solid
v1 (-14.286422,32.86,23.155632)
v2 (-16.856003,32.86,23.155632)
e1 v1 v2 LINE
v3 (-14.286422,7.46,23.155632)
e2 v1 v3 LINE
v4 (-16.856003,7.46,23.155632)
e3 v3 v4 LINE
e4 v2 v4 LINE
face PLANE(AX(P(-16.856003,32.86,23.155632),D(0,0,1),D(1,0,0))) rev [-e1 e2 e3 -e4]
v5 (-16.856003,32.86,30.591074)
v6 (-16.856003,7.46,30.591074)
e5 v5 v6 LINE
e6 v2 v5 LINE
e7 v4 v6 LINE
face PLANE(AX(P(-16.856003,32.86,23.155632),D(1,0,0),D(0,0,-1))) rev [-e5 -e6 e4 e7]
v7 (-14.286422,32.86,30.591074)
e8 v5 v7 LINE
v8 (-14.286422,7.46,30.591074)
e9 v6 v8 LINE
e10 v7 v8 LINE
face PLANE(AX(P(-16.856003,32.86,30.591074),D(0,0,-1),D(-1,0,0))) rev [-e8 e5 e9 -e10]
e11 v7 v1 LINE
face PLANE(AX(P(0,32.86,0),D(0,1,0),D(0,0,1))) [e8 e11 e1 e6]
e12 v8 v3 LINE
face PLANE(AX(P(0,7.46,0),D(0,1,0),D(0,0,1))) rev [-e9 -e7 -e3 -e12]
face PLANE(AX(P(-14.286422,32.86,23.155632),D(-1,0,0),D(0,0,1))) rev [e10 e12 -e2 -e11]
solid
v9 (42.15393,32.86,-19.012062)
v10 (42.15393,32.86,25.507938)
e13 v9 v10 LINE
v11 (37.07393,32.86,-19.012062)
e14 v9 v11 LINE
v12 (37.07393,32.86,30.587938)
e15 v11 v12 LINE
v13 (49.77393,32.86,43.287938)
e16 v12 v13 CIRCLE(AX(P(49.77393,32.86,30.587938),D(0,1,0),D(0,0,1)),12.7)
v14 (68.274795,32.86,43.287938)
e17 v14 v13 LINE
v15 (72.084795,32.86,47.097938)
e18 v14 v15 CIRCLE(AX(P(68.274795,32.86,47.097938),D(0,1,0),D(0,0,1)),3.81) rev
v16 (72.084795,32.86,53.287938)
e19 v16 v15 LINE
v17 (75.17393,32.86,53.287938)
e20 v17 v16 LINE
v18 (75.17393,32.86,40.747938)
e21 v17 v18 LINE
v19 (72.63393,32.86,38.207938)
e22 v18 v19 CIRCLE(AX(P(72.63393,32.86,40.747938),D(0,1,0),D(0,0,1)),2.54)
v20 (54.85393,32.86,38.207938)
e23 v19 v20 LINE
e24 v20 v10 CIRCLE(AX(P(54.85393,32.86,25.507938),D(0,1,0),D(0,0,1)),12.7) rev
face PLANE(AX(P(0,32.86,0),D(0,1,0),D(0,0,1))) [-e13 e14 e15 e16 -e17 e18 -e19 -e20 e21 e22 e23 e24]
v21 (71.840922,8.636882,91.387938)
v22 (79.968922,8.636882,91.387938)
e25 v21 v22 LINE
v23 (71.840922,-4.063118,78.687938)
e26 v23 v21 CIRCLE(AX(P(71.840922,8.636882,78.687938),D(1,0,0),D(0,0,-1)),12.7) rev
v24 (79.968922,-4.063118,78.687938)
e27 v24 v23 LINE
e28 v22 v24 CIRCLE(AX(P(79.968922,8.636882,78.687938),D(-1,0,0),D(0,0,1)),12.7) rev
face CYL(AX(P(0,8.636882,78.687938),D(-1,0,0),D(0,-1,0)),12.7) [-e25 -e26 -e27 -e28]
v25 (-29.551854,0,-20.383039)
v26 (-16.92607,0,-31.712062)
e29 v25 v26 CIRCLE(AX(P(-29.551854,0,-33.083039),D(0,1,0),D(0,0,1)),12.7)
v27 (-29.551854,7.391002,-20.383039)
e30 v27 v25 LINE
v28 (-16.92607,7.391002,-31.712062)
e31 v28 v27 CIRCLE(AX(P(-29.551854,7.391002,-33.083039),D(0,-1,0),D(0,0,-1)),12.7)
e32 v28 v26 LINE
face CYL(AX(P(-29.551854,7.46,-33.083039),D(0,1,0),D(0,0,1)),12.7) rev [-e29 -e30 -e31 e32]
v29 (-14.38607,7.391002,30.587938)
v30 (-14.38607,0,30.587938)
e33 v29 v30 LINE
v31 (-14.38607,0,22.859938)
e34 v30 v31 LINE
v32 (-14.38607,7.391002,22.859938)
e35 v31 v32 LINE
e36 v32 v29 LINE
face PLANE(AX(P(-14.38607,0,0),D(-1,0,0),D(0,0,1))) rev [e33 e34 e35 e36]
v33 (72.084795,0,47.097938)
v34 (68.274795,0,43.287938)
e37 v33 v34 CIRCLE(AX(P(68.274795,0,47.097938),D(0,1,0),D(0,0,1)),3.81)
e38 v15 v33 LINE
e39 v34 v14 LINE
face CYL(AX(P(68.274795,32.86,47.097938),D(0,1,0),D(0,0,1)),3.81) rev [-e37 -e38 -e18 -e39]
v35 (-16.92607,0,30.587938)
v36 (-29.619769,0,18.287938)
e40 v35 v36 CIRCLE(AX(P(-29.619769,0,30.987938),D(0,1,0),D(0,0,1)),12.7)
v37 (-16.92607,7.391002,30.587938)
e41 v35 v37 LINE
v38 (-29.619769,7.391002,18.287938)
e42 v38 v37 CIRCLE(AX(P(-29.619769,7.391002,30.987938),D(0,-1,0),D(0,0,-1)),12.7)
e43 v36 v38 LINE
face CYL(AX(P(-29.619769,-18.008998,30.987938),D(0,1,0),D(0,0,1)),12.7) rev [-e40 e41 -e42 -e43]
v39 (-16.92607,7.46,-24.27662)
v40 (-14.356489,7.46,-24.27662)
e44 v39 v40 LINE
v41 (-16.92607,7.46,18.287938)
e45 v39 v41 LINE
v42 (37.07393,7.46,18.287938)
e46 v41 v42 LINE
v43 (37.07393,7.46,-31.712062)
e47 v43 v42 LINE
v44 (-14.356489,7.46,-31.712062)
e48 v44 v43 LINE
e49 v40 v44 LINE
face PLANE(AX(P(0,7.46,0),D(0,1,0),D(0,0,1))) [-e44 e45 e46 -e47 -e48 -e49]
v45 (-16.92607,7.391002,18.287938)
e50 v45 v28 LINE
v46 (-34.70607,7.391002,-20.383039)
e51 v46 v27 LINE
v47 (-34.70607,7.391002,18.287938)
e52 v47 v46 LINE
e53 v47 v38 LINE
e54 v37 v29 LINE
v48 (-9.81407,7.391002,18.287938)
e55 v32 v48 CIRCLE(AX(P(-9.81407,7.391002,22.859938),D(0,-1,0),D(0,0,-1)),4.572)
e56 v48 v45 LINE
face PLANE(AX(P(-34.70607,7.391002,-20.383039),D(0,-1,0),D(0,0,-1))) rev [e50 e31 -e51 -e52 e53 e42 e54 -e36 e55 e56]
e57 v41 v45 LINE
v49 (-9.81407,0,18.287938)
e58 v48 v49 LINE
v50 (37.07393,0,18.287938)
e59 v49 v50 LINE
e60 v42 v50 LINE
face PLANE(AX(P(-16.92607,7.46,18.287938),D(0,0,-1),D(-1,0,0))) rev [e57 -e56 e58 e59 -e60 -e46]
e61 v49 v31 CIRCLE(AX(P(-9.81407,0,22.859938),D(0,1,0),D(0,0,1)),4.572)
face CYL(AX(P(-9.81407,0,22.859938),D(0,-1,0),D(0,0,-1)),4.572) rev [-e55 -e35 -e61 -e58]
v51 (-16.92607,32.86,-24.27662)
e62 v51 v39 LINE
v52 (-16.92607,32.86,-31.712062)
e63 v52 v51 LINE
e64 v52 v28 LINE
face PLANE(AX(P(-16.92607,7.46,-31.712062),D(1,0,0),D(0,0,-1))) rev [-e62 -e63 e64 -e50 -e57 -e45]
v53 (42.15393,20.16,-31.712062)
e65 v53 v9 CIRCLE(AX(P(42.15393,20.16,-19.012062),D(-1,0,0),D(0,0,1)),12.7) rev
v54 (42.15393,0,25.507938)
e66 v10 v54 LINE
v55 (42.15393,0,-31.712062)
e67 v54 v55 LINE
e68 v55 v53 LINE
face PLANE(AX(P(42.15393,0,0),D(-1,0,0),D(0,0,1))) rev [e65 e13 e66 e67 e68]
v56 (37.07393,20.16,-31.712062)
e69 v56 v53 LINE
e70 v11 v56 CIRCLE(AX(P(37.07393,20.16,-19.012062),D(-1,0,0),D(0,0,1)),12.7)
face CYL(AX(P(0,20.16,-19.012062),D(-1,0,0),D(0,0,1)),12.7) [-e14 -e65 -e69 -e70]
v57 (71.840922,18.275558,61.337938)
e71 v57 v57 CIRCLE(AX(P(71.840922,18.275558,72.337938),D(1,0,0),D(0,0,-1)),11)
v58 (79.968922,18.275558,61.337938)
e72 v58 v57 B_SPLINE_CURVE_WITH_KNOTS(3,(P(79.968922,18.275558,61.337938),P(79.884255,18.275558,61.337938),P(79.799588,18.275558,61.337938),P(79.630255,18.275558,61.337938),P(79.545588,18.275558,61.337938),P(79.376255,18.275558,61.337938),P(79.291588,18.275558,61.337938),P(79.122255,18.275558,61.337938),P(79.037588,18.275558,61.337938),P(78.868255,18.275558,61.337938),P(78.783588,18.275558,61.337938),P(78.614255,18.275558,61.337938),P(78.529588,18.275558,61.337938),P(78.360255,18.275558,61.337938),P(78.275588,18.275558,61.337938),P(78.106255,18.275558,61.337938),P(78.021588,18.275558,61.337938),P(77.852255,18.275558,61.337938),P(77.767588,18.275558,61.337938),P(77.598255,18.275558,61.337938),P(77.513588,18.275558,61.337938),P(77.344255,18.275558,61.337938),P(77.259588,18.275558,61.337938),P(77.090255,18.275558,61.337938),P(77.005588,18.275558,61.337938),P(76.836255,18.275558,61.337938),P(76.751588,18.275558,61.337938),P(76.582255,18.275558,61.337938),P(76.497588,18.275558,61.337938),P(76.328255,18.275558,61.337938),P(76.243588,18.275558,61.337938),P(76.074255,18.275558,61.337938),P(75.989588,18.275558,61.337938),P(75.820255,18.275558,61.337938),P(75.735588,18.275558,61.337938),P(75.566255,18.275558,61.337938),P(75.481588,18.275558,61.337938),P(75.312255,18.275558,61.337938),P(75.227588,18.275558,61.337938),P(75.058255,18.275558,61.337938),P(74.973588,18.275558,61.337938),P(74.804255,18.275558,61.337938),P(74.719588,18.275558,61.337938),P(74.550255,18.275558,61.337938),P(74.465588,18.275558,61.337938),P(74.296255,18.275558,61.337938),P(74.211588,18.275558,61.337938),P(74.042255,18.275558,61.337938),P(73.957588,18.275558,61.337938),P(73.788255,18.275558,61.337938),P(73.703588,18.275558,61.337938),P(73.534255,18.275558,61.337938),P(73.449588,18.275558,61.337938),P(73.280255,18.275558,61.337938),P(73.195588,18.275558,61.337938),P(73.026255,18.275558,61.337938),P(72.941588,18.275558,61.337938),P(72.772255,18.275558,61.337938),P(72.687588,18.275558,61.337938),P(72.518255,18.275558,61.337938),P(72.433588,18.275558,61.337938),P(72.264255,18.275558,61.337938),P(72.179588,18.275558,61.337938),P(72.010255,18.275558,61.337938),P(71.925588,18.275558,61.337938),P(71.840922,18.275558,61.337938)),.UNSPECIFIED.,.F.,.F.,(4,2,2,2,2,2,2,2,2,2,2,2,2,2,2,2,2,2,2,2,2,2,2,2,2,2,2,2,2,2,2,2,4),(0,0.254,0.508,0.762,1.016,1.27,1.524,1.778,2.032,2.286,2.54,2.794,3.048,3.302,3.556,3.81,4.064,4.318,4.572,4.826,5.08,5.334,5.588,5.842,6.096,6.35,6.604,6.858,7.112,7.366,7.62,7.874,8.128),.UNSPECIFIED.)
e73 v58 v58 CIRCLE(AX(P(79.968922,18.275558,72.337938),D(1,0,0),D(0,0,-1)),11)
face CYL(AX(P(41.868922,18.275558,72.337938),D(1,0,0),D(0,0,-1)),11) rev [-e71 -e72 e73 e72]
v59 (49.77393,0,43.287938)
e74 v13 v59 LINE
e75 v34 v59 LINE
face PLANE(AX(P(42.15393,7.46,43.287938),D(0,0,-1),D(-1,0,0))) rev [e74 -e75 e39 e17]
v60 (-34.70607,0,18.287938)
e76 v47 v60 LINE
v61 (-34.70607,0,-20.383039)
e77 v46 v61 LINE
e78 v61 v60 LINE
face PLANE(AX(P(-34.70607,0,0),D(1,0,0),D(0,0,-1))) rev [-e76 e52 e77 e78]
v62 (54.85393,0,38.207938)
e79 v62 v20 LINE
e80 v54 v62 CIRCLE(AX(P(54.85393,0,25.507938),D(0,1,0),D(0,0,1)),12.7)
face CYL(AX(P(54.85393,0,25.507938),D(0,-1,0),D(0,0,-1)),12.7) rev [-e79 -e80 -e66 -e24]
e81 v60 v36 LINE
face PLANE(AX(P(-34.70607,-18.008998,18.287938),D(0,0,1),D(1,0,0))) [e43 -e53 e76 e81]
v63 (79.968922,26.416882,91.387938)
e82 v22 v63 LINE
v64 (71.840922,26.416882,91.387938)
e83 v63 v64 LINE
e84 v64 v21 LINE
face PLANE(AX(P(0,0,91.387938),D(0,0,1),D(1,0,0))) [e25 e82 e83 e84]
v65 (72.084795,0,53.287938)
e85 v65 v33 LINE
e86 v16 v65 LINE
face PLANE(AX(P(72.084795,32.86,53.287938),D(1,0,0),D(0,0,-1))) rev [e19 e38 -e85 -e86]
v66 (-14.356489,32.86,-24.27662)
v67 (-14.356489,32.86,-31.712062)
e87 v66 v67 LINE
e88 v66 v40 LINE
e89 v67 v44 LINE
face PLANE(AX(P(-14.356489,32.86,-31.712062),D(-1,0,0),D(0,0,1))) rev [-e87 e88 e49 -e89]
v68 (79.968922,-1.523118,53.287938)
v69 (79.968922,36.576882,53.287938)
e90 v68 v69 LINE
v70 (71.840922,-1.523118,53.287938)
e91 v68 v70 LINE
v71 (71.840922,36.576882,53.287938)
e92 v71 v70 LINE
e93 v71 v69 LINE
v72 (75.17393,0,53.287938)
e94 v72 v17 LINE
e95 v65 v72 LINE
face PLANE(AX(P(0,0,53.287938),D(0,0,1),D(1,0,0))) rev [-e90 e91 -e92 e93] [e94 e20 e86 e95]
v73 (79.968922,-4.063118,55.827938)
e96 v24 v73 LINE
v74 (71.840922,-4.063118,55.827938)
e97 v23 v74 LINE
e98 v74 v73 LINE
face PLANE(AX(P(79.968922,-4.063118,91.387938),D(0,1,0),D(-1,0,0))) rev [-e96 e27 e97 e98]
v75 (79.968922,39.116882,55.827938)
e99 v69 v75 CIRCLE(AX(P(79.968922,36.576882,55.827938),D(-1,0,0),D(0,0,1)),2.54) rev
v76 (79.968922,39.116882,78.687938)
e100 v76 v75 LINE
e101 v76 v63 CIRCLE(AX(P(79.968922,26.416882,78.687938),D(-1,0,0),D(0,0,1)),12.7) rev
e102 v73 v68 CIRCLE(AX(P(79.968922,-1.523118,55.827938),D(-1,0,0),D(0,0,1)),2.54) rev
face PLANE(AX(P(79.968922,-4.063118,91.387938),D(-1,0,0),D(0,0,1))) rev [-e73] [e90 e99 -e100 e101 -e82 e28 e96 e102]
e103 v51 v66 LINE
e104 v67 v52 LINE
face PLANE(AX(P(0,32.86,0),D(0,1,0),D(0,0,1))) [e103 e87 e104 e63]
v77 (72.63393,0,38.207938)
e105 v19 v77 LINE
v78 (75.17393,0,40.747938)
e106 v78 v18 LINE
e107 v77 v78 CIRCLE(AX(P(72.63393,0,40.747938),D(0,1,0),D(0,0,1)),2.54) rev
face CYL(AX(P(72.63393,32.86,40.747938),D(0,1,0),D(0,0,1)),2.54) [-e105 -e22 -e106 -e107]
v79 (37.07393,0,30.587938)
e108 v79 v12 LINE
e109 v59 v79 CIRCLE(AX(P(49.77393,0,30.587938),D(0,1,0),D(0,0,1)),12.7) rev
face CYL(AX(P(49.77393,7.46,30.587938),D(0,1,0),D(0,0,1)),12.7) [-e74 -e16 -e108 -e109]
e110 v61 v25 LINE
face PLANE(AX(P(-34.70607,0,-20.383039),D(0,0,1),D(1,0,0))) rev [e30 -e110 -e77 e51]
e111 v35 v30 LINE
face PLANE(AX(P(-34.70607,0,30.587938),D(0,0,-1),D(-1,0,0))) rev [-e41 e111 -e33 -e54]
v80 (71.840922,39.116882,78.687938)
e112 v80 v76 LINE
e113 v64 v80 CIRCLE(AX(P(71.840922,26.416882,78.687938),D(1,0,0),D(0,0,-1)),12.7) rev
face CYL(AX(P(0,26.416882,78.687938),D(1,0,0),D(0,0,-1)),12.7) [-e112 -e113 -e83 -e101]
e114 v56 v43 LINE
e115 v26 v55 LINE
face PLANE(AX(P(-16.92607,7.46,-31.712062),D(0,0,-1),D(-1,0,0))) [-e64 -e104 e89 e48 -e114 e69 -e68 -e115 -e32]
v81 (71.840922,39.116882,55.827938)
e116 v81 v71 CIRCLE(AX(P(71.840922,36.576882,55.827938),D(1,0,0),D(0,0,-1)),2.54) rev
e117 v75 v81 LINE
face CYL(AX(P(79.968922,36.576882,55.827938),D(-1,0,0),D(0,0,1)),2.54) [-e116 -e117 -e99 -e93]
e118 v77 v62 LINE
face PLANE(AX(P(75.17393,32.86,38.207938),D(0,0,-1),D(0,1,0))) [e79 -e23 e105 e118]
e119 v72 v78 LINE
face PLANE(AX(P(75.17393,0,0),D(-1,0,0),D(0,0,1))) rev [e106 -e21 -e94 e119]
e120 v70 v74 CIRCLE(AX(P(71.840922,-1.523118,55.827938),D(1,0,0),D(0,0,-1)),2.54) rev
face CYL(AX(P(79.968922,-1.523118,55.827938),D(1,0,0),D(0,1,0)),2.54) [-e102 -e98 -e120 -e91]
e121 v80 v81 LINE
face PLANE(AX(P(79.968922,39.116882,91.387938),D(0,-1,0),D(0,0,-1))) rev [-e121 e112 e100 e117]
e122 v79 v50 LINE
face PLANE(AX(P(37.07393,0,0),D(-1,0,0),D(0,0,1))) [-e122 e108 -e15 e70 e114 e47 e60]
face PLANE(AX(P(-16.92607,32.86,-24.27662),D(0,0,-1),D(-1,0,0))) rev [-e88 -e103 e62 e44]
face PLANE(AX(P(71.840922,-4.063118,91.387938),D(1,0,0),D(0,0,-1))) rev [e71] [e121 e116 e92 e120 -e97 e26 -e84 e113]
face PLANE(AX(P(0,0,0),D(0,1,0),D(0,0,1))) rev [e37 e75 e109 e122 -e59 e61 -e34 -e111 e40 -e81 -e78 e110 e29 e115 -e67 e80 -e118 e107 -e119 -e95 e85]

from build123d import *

# Parameters (mm, degrees)
SKETCH1_W            = 54
SKETCH1_H            = 50
BOSS_EXTRUDE1_DEPTH  = 7.460000066
SKETCH2_W            = 75
SKETCH2_H            = 7.460000066
BOSS_EXTRUDE2_DEPTH  = 5.08
SKETCH4_W            = 5.08
SKETCH4_H            = 75
BOSS_EXTRUDE3_DEPTH  = 25.4
FILLET1_R            = 12.7
SKETCH6_W            = 5.08
SKETCH6_H            = 32.860000066
BOSS_EXTRUDE4_DEPTH  = 33.02
FILLET2_R            = 12.7
FILLET3_R            = 12.7
SKETCH9_W            = 3.089134775
SKETCH9_H            = 32.860000066
BOSS_EXTRUDE5_DEPTH  = 10
SKETCH10_W           = 8.128
SKETCH10_H           = 43.18
BOSS_EXTRUDE6_DEPTH  = 38.1
FILLET4_R            = 12.7
FILLET5_R            = 2.54
SKETCH11_R           = 11
CUT_EXTRUDE1_DEPTH   = 38.1
FILLET6_R            = 2.54
FILLET7_R            = 3.81
SKETCH18_W           = 50.970977204
SKETCH18_H           = 7.39100176
BOSS_EXTRUDE8_DEPTH  = 17.78
FILLET12_R           = 12.7
SKETCH23_W           = 12.3
SKETCH23_H           = 7.39100176
BOSS_EXTRUDE9_DEPTH  = 7.62
SKETCH24_W           = 2.569580913
SKETCH24_H           = 7.435441969
BOSS_EXTRUDE10_DEPTH = 25.4
SKETCH28_W           = 17.78
SKETCH28_H           = 12.3
CUT_EXTRUDE8_DEPTH   = 25.4
FILLET14_R           = 12.7
SKETCH30_W           = 12.3
SKETCH30_H           = 7.39100176
CUT_EXTRUDE9_DEPTH   = 5.08
FILLET16_R           = 4.572


with BuildPart() as part:
    # Sketch1 → Boss-Extrude1 (new body)
    with BuildSketch(Plane(origin=(0, 0, 0), x_dir=(1, 0, 0), z_dir=(0, 1, 0))):
        with Locations((10.073929961, 6.712062257)):
            Rectangle(SKETCH1_W, SKETCH1_H)
    extrude(amount=BOSS_EXTRUDE1_DEPTH)

    # Sketch2 → Boss-Extrude2 (add)
    with BuildSketch(Plane(origin=(37.073929961, 0, 0), x_dir=(0, 0, -1), z_dir=(1, 0, 0))):
        with Locations((-5.787937743, 3.730000033)):
            Rectangle(SKETCH2_W, SKETCH2_H)
    extrude(amount=BOSS_EXTRUDE2_DEPTH)

    # Sketch4 → Boss-Extrude3 (add)
    with BuildSketch(Plane(origin=(0, 7.460000066, 0), x_dir=(1, 0, 0), z_dir=(0, 1, 0))):
        with Locations((39.613929961, -5.787937743)):
            Rectangle(SKETCH4_W, SKETCH4_H)
    extrude(amount=BOSS_EXTRUDE3_DEPTH)

    # Fillet1
    fillet1_edges = [part.edges().sort_by_distance(p)[0] for p in [
        (39.613929961, 32.860000066, -31.712062257),
    ]]
    fillet(fillet1_edges, radius=FILLET1_R)

    # Sketch6 → Boss-Extrude4 (add)
    with BuildSketch(Plane(origin=(42.153929961, 0, 0), x_dir=(0, 0, -1), z_dir=(1, 0, 0))):
        with Locations((-40.747937743, 16.430000033)):
            Rectangle(SKETCH6_W, SKETCH6_H)
    extrude(amount=BOSS_EXTRUDE4_DEPTH)

    # Fillet2
    fillet2_edges = [part.edges().sort_by_distance(p)[0] for p in [
        (42.153929961, 16.430000033, 38.207937743),
    ]]
    fillet(fillet2_edges, radius=FILLET2_R)

    # Fillet3
    fillet3_edges = [part.edges().sort_by_distance(p)[0] for p in [
        (37.073929961, 16.430000033, 43.287937743),
    ]]
    fillet(fillet3_edges, radius=FILLET3_R)

    # Sketch9 → Boss-Extrude5 (add)
    with BuildSketch(Plane.XY.offset(43.287937743)):
        with Locations((73.629362574, 16.430000033)):
            Rectangle(SKETCH9_W, SKETCH9_H)
    extrude(amount=BOSS_EXTRUDE5_DEPTH)

    # Sketch10 → Boss-Extrude6 (add)
    with BuildSketch(Plane.XY.offset(53.287937743)):
        with Locations((75.90492166, 17.526882494)):
            Rectangle(SKETCH10_W, SKETCH10_H)
    extrude(amount=BOSS_EXTRUDE6_DEPTH)

    # Fillet4
    fillet4_edges = [part.edges().sort_by_distance(p)[0] for p in [
        (75.90492166, 39.116882494, 91.387937743),
        (75.90492166, -4.063117506, 91.387937743),
    ]]
    fillet(fillet4_edges, radius=FILLET4_R)

    # Fillet5
    fillet5_edges = [part.edges().sort_by_distance(p)[0] for p in [
        (75.90492166, 39.116882494, 53.287937743),
        (75.90492166, -4.063117506, 53.287937743),
    ]]
    fillet(fillet5_edges, radius=FILLET5_R)

    # Sketch11 → Cut-Extrude1 (cut)
    with BuildSketch(Plane(origin=(79.96892166, 0, 0), x_dir=(0, 0, -1), z_dir=(1, 0, 0))):
        with Locations((-72.337937743, 18.275557959)):
            Circle(SKETCH11_R)
    extrude(amount=-CUT_EXTRUDE1_DEPTH, mode=Mode.SUBTRACT)

    # Fillet6
    fillet6_edges = [part.edges().sort_by_distance(p)[0] for p in [
        (75.173929961, 16.430000033, 38.207937743),
    ]]
    fillet(fillet6_edges, radius=FILLET6_R)

    # Fillet7
    fillet7_edges = [part.edges().sort_by_distance(p)[0] for p in [
        (72.084795186, 16.430000033, 43.287937743),
    ]]
    fillet(fillet7_edges, radius=FILLET7_R)

    # Sketch18 → Boss-Extrude8 (add)
    with BuildSketch(Plane.ZY.offset(16.926070039)):
        with Locations((5.102449141, 3.69550088)):
            Rectangle(SKETCH18_W, SKETCH18_H)
    extrude(amount=BOSS_EXTRUDE8_DEPTH)

    # Fillet12
    # the kernel refuses this fillet: 12.7 mm, written as the material it adds along each edge
    with BuildSketch(Plane(origin=(-16.926070039, 7.39100176, -20.383039461), x_dir=(0, 0, -1), z_dir=(0, -1, 0))) as fillet12_piece_1:
        with BuildLine():
            CenterArc((12.7, -12.625783996), FILLET12_R, 96.197210877, 83.802789123)
            Line((0, -12.625783996), (-0.254, -12.625783996))
            Line((-0.254, -12.625783996), (-0.254, 0))
            Line((-0.254, 0), (0, 0.254))
            ThreePointArc((0, 0.254), (5.664511398, 0.254), (11.301603252, 0.25251568))
            Line((11.301603252, 0.25251568), (11.329022796, 0))
        make_face()
    extrude(amount=7.39100176)

    # Sketch23 → Boss-Extrude9 (add)
    with BuildSketch(Plane(origin=(-16.926070039, 0, 0), x_dir=(0, 0, -1), z_dir=(1, 0, 0))):
        with Locations((-24.437937743, 3.69550088)):
            Rectangle(SKETCH23_W, SKETCH23_H)
    extrude(amount=BOSS_EXTRUDE9_DEPTH)

    # Sketch24 → Boss-Extrude10 (add)
    with BuildSketch(Plane(origin=(0, 7.460000066, 0), x_dir=(1, 0, 0), z_dir=(0, 1, 0))):
        with Locations((-15.641279583, 27.994341273)):
            Rectangle(SKETCH24_W, SKETCH24_H)
        with Locations((-15.571212374, -26.873353003)):
            Rectangle(SKETCH24_W, SKETCH24_H)
    extrude(amount=BOSS_EXTRUDE10_DEPTH)


with BuildPart() as boss_extrude10_piece_1:
    # of the separate pieces the step leaves, piece 1, a body of its own (boss_extrude10_pieces)
    add(part.part.solids().sort_by_distance((-16.926070039, 0, -31.712062257))[0])

    # Sketch28 → Cut-Extrude8 (cut)
    with BuildSketch(Plane(origin=(0, 7.39100176, 0), x_dir=(1, 0, 0), z_dir=(0, 1, 0))):
        with Locations((-25.816070039, -24.437937743)):
            Rectangle(SKETCH28_W, SKETCH28_H)
    extrude(amount=-CUT_EXTRUDE8_DEPTH, mode=Mode.SUBTRACT)

    # Fillet14
    # the kernel refuses this fillet: 12.7 mm, written as the material it adds along each edge
    with BuildSketch(Plane(origin=(-16.926070039, 7.39100176, 18.287937743), x_dir=(-1, 0, 0), z_dir=(0, -1, 0))) as fillet14_piece_1:
        with BuildLine():
            CenterArc((12.693699224, -12.7), FILLET14_R, 90, 88.195110026)
            Line((0, -12.3), (-0.253873984, -12.292))
            ThreePointArc((-0.253873984, -12.292), (-0.254, -6.15), (-0.254, 0))
            Line((-0.254, 0), (0, 0.254))
            Line((0, 0.254), (12.693699224, 0.254))
            Line((12.693699224, 0.254), (12.693699224, 0))
        make_face()
    extrude(amount=7.39100176)

    # Sketch30 → Cut-Extrude9 (cut)
    with BuildSketch(Plane(origin=(-9.306070039, 0, 0), x_dir=(0, 0, -1), z_dir=(1, 0, 0))):
        with Locations((-24.437937743, 3.69550088)):
            Rectangle(SKETCH30_W, SKETCH30_H)
    extrude(amount=-CUT_EXTRUDE9_DEPTH, mode=Mode.SUBTRACT)

    # Fillet16
    fillet16_edges = [boss_extrude10_piece_1.edges().sort_by_distance(p)[0] for p in [
        (-14.386070039, 3.69550088, 18.287937743),
    ]]
    fillet(fillet16_edges, radius=FILLET16_R)


with BuildPart() as boss_extrude10_piece_2:
    # of the separate pieces the step leaves, piece 2, a body of its own (boss_extrude10_pieces)
    add(part.part.solids().sort_by_distance((-16.856002831, 7.460000066, 23.155632018))[0])


solid = Compound([boss_extrude10_piece_1.part, boss_extrude10_piece_2.part])
